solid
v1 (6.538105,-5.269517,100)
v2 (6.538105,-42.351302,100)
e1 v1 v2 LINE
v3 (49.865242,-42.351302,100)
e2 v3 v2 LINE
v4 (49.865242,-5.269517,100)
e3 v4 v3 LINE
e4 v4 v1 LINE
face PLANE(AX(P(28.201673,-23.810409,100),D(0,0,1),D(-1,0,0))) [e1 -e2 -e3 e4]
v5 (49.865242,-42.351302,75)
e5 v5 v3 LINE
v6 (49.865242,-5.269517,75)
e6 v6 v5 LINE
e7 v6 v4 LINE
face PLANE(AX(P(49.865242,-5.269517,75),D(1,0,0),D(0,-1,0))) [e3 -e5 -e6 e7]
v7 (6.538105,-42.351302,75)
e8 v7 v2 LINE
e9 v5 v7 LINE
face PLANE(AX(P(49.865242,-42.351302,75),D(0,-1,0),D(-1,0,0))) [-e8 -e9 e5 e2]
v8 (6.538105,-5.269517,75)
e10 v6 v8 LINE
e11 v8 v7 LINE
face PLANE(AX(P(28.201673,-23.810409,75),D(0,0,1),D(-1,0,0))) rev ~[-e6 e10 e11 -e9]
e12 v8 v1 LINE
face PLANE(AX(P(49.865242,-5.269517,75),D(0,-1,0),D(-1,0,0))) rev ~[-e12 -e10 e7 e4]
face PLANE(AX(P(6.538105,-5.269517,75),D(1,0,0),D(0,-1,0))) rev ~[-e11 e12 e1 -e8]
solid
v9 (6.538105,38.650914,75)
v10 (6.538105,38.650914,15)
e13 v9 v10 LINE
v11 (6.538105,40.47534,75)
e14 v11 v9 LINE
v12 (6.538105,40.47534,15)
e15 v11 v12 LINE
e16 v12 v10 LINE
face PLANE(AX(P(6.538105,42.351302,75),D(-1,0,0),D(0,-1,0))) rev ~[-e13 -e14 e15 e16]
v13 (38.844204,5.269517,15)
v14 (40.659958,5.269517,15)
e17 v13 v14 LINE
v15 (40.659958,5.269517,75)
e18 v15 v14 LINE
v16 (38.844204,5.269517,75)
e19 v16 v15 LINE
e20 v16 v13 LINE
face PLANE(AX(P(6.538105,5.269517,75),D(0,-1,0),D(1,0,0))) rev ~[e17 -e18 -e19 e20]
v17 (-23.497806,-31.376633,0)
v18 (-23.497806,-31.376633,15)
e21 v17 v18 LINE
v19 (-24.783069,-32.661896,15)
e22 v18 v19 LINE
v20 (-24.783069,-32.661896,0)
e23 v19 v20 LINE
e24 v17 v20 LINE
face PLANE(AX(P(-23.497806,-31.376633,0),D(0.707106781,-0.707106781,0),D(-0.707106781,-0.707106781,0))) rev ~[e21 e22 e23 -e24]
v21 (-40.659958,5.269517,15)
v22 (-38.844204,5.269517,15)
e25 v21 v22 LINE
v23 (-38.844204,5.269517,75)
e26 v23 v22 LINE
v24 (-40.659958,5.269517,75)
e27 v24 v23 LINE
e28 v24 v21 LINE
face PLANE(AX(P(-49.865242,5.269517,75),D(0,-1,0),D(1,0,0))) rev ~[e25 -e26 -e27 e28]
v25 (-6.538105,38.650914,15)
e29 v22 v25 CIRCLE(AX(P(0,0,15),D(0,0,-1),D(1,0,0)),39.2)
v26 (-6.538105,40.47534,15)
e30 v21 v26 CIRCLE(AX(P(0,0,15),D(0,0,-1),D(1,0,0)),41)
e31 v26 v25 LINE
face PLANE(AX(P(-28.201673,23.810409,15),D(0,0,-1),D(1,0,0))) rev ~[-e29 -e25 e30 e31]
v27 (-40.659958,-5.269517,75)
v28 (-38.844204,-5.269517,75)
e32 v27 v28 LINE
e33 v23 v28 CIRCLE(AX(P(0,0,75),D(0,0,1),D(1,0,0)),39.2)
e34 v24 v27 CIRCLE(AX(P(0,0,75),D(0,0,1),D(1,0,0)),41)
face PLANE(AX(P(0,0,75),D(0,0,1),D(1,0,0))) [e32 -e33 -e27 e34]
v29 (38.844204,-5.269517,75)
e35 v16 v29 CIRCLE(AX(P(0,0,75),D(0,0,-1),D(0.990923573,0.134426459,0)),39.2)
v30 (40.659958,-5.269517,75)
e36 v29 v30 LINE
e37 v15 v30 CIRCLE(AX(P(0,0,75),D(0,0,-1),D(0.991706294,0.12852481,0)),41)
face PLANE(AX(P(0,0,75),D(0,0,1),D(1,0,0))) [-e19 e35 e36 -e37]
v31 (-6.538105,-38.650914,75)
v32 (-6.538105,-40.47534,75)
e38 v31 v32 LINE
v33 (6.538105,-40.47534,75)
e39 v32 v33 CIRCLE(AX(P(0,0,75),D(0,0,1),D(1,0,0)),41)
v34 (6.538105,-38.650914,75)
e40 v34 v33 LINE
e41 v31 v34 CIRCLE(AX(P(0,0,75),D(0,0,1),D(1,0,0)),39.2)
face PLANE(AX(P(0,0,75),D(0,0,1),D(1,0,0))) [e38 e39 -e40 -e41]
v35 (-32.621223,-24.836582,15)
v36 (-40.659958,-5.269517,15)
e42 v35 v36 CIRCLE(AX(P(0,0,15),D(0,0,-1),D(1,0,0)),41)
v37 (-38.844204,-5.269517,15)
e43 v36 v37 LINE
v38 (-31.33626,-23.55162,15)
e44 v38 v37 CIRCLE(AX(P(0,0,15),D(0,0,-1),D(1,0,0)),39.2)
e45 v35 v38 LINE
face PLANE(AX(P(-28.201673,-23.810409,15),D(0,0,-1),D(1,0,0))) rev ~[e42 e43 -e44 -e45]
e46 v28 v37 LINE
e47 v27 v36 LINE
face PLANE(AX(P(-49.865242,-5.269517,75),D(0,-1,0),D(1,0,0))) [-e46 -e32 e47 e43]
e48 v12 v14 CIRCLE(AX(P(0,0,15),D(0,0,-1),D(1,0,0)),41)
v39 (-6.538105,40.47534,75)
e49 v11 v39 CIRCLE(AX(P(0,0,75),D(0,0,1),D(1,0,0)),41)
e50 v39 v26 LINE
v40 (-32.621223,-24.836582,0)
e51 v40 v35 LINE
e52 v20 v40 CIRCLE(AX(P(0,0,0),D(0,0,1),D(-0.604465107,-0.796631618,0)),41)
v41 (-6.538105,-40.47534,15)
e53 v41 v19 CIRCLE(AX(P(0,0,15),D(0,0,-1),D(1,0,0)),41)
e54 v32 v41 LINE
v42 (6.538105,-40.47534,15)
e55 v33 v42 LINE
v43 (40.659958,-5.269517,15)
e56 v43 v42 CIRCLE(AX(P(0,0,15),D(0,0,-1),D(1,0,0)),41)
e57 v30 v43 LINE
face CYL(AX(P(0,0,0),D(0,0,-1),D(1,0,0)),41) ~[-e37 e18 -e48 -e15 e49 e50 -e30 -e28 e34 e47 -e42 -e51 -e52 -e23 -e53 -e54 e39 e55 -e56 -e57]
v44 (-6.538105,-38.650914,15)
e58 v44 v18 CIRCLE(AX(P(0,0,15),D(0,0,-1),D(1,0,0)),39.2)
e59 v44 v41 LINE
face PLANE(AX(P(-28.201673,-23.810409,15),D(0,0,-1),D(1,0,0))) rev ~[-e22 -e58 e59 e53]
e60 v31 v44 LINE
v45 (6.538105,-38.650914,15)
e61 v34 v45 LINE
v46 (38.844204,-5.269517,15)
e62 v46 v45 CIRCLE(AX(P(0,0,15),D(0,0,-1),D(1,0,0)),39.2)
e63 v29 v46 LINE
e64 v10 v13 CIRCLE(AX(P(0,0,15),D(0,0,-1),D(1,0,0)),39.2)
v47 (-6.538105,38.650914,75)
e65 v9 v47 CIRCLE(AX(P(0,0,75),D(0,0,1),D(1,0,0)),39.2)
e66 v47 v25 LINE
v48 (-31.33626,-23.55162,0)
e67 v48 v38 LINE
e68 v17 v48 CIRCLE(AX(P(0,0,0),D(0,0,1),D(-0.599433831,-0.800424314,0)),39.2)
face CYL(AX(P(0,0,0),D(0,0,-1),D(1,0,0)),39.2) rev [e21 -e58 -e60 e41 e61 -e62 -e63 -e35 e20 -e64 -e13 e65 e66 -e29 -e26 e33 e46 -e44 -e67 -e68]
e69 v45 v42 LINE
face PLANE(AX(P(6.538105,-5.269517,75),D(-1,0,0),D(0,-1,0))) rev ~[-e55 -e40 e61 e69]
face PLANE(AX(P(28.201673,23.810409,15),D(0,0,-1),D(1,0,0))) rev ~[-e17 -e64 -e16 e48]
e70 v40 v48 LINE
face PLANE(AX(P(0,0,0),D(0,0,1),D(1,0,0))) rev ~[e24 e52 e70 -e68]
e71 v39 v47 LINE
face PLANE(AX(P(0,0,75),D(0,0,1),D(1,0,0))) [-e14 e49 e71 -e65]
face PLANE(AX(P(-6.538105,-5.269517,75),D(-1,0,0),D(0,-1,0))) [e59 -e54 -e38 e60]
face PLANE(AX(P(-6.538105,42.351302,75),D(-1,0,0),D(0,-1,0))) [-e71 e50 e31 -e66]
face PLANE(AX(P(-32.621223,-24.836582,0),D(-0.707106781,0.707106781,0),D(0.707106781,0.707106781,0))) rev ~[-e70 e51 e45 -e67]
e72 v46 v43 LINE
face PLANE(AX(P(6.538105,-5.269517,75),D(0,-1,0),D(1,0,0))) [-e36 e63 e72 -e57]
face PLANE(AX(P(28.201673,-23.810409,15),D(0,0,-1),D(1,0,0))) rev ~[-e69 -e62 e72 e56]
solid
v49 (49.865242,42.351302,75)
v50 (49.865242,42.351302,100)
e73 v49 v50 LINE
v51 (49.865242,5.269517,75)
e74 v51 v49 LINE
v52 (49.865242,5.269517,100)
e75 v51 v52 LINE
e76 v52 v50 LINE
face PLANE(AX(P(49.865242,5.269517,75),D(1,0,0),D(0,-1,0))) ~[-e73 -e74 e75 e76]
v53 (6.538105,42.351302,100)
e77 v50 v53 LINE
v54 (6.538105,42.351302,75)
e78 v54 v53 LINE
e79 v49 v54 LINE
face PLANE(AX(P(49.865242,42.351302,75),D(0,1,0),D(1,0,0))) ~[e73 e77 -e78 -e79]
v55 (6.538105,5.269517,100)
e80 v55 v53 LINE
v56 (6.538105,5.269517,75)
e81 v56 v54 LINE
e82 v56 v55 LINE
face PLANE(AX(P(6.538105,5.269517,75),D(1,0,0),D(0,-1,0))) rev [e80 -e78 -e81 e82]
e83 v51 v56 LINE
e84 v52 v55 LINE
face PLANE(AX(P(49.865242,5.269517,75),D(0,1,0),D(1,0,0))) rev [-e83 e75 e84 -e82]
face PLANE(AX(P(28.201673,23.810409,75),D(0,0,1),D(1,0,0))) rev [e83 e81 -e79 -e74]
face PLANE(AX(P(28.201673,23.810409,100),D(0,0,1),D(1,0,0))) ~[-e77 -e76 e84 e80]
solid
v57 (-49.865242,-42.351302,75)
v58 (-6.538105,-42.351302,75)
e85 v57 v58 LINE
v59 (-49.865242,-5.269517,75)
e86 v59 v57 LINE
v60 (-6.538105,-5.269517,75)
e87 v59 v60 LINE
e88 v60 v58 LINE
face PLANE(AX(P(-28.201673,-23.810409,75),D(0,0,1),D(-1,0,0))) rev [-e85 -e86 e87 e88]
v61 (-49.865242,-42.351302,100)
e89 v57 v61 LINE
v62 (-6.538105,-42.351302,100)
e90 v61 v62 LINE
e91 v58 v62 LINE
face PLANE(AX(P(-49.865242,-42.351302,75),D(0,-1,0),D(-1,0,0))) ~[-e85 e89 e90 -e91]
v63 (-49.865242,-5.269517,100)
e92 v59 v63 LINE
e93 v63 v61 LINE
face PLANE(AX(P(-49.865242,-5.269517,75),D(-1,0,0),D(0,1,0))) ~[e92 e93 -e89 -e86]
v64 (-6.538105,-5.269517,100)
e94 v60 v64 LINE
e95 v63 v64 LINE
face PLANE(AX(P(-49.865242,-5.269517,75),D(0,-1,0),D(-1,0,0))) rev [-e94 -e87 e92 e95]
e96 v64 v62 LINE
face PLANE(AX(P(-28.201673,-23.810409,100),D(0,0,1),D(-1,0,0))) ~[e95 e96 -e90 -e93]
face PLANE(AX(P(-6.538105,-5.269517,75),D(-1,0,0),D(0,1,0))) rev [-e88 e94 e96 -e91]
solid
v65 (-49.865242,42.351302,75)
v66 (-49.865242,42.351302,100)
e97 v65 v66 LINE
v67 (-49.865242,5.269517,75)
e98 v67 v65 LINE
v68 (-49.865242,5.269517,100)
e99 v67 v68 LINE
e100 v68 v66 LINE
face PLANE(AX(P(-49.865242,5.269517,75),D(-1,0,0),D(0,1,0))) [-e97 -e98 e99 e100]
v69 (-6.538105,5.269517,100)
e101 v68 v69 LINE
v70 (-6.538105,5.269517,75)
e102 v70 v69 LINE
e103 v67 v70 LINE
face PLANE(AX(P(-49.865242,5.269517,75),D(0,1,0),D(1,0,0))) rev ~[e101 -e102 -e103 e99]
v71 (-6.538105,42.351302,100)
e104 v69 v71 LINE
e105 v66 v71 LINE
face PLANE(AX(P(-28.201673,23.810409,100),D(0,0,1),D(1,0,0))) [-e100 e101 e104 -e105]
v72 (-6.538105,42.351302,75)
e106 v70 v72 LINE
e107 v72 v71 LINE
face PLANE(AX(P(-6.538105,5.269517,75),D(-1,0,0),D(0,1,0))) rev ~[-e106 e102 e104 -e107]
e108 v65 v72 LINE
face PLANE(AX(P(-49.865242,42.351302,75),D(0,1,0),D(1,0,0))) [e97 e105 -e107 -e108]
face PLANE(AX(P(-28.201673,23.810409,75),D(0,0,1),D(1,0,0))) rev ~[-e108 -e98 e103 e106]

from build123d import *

# Parameters (mm, degrees)
F0_R      = 41
F1_DEPTH  = 75
F2_T      = -1.8
F3_W      = 43.3271373622
F3_H      = 37.0817845687
F4_DEPTH  = 25
F5_FACE_W = 43.3271373622
F5_FACE_H = 37.0817845687
F4_FACE_W = 43.3271373622
F4_FACE_H = 37.0817845687
F6_FACE_W = 43.3271373622
F6_FACE_H = 37.0817845687
F7_DEPTH  = 60
F10_DEPTH = 25


with BuildPart() as f1:
    # F0 (on Top) → F1 (new body)
    with BuildSketch(Plane.XY):
        Circle(F0_R)
    extrude(amount=F1_DEPTH)

    # F2
    f2_openings = [f1.faces().sort_by_distance(p)[0] for p in [
        (0, 0, 75),
        (0, 0, 0),
    ]]
    offset(amount=F2_T, openings=f2_openings)

    # F5_face (on face) + F4_face (on face) + F6_face (on face) → F7 (cut)
    with BuildSketch(Plane(origin=(28.2016734127, 23.8104094751, 75), x_dir=(1, 0, 0), z_dir=(0, 0, -1))):
        Rectangle(F5_FACE_W, F5_FACE_H)
    with BuildSketch(Plane(origin=(-28.2016734127, 23.8104094751, 75), x_dir=(1, 0, 0), z_dir=(0, 0, -1))):
        Rectangle(F4_FACE_W, F4_FACE_H)
    with BuildSketch(Plane(origin=(-28.2016734127, -23.8104094751, 75), x_dir=(1, 0, 0), z_dir=(0, 0, -1))):
        Rectangle(F6_FACE_W, F6_FACE_H)
        with Locations((56.4033468254, 0)):
            Rectangle(F6_FACE_W, F6_FACE_H)
    extrude(amount=F7_DEPTH, mode=Mode.SUBTRACT)

    # F9 (on face) → F10 (cut)
    with BuildSketch(Plane(origin=(0, 0, 0), x_dir=(1, 0, 0), z_dir=(0, 0, -1))):
        with BuildLine():
            Line((-26.0766707361, 33.9554976672), (-29.992537573, 30.0396308303))
            Line((-29.992537573, 30.0396308303), (-27.9037735724, 30.0396308303))
            ThreePointArc((-27.9037735724, 30.0396308303), (-26.3760293541, 31.3895695337), (-24.7830693928, 32.6618963239))
            Line((-24.7830693928, 32.6618963239), (-26.0766707361, 33.9554976672))
        make_face()
        with BuildLine():
            ThreePointArc((-24.7830693928, 32.6618963239), (-26.3760293541, 31.3895695337), (-27.9037735724, 30.0396308303))
            Line((-27.9037735724, 30.0396308303), (-25.184530561, 30.0396308303))
            ThreePointArc((-25.184530561, 30.0396308303), (-24.3503464301, 30.7197107528), (-23.497806174, 31.3766331051))
            Line((-23.497806174, 31.3766331051), (-24.7830693928, 32.6618963239))
        make_face()
        with BuildLine():
            Line((-25.184530561, 30.0396308303), (-27.9037735724, 30.0396308303))
            ThreePointArc((-27.9037735724, 30.0396308303), (-28.9669254959, 29.0158099545), (-29.992537573, 27.9543858801))
            Line((-29.992537573, 27.9543858801), (-29.992537573, 25.2405960693))
            ThreePointArc((-29.992537573, 25.2405960693), (-27.6926866813, 27.7444607872), (-25.184530561, 30.0396308303))
        make_face()
        with BuildLine():
            Line((-29.992537573, 25.2405960693), (-29.992537573, 27.9543858801))
            ThreePointArc((-29.992537573, 27.9543858801), (-31.3456683019, 26.4281872005), (-32.6212227873, 24.8365823708))
            Line((-32.6212227873, 24.8365823708), (-31.3362602205, 23.551619804))
            ThreePointArc((-31.3362602205, 23.551619804), (-30.6760251647, 24.4053576105), (-29.992537573, 25.2405960693))
        make_face()
    extrude(amount=-F10_DEPTH, mode=Mode.SUBTRACT)


with BuildPart() as f4:
    # F3 (on face) → F4 (new body)
    with BuildSketch(Plane.XY.offset(75)):
        with Locations((-28.2016734127, 23.8104094751)):
            Rectangle(F3_W, F3_H)
    extrude(amount=F4_DEPTH)


with BuildPart() as f5_1:
    # F5: instance of F4
    add(f4.part.mirror(Plane.YZ))


with BuildPart() as f6_1:
    # F6: instance of F4
    add(f4.part.mirror(Plane.XZ))


with BuildPart() as f6_2:
    # F6: instance of F5_1
    add(f5_1.part.mirror(Plane.XZ))


solid = Compound([f1.part, f4.part, f5_1.part, f6_1.part, f6_2.part])
